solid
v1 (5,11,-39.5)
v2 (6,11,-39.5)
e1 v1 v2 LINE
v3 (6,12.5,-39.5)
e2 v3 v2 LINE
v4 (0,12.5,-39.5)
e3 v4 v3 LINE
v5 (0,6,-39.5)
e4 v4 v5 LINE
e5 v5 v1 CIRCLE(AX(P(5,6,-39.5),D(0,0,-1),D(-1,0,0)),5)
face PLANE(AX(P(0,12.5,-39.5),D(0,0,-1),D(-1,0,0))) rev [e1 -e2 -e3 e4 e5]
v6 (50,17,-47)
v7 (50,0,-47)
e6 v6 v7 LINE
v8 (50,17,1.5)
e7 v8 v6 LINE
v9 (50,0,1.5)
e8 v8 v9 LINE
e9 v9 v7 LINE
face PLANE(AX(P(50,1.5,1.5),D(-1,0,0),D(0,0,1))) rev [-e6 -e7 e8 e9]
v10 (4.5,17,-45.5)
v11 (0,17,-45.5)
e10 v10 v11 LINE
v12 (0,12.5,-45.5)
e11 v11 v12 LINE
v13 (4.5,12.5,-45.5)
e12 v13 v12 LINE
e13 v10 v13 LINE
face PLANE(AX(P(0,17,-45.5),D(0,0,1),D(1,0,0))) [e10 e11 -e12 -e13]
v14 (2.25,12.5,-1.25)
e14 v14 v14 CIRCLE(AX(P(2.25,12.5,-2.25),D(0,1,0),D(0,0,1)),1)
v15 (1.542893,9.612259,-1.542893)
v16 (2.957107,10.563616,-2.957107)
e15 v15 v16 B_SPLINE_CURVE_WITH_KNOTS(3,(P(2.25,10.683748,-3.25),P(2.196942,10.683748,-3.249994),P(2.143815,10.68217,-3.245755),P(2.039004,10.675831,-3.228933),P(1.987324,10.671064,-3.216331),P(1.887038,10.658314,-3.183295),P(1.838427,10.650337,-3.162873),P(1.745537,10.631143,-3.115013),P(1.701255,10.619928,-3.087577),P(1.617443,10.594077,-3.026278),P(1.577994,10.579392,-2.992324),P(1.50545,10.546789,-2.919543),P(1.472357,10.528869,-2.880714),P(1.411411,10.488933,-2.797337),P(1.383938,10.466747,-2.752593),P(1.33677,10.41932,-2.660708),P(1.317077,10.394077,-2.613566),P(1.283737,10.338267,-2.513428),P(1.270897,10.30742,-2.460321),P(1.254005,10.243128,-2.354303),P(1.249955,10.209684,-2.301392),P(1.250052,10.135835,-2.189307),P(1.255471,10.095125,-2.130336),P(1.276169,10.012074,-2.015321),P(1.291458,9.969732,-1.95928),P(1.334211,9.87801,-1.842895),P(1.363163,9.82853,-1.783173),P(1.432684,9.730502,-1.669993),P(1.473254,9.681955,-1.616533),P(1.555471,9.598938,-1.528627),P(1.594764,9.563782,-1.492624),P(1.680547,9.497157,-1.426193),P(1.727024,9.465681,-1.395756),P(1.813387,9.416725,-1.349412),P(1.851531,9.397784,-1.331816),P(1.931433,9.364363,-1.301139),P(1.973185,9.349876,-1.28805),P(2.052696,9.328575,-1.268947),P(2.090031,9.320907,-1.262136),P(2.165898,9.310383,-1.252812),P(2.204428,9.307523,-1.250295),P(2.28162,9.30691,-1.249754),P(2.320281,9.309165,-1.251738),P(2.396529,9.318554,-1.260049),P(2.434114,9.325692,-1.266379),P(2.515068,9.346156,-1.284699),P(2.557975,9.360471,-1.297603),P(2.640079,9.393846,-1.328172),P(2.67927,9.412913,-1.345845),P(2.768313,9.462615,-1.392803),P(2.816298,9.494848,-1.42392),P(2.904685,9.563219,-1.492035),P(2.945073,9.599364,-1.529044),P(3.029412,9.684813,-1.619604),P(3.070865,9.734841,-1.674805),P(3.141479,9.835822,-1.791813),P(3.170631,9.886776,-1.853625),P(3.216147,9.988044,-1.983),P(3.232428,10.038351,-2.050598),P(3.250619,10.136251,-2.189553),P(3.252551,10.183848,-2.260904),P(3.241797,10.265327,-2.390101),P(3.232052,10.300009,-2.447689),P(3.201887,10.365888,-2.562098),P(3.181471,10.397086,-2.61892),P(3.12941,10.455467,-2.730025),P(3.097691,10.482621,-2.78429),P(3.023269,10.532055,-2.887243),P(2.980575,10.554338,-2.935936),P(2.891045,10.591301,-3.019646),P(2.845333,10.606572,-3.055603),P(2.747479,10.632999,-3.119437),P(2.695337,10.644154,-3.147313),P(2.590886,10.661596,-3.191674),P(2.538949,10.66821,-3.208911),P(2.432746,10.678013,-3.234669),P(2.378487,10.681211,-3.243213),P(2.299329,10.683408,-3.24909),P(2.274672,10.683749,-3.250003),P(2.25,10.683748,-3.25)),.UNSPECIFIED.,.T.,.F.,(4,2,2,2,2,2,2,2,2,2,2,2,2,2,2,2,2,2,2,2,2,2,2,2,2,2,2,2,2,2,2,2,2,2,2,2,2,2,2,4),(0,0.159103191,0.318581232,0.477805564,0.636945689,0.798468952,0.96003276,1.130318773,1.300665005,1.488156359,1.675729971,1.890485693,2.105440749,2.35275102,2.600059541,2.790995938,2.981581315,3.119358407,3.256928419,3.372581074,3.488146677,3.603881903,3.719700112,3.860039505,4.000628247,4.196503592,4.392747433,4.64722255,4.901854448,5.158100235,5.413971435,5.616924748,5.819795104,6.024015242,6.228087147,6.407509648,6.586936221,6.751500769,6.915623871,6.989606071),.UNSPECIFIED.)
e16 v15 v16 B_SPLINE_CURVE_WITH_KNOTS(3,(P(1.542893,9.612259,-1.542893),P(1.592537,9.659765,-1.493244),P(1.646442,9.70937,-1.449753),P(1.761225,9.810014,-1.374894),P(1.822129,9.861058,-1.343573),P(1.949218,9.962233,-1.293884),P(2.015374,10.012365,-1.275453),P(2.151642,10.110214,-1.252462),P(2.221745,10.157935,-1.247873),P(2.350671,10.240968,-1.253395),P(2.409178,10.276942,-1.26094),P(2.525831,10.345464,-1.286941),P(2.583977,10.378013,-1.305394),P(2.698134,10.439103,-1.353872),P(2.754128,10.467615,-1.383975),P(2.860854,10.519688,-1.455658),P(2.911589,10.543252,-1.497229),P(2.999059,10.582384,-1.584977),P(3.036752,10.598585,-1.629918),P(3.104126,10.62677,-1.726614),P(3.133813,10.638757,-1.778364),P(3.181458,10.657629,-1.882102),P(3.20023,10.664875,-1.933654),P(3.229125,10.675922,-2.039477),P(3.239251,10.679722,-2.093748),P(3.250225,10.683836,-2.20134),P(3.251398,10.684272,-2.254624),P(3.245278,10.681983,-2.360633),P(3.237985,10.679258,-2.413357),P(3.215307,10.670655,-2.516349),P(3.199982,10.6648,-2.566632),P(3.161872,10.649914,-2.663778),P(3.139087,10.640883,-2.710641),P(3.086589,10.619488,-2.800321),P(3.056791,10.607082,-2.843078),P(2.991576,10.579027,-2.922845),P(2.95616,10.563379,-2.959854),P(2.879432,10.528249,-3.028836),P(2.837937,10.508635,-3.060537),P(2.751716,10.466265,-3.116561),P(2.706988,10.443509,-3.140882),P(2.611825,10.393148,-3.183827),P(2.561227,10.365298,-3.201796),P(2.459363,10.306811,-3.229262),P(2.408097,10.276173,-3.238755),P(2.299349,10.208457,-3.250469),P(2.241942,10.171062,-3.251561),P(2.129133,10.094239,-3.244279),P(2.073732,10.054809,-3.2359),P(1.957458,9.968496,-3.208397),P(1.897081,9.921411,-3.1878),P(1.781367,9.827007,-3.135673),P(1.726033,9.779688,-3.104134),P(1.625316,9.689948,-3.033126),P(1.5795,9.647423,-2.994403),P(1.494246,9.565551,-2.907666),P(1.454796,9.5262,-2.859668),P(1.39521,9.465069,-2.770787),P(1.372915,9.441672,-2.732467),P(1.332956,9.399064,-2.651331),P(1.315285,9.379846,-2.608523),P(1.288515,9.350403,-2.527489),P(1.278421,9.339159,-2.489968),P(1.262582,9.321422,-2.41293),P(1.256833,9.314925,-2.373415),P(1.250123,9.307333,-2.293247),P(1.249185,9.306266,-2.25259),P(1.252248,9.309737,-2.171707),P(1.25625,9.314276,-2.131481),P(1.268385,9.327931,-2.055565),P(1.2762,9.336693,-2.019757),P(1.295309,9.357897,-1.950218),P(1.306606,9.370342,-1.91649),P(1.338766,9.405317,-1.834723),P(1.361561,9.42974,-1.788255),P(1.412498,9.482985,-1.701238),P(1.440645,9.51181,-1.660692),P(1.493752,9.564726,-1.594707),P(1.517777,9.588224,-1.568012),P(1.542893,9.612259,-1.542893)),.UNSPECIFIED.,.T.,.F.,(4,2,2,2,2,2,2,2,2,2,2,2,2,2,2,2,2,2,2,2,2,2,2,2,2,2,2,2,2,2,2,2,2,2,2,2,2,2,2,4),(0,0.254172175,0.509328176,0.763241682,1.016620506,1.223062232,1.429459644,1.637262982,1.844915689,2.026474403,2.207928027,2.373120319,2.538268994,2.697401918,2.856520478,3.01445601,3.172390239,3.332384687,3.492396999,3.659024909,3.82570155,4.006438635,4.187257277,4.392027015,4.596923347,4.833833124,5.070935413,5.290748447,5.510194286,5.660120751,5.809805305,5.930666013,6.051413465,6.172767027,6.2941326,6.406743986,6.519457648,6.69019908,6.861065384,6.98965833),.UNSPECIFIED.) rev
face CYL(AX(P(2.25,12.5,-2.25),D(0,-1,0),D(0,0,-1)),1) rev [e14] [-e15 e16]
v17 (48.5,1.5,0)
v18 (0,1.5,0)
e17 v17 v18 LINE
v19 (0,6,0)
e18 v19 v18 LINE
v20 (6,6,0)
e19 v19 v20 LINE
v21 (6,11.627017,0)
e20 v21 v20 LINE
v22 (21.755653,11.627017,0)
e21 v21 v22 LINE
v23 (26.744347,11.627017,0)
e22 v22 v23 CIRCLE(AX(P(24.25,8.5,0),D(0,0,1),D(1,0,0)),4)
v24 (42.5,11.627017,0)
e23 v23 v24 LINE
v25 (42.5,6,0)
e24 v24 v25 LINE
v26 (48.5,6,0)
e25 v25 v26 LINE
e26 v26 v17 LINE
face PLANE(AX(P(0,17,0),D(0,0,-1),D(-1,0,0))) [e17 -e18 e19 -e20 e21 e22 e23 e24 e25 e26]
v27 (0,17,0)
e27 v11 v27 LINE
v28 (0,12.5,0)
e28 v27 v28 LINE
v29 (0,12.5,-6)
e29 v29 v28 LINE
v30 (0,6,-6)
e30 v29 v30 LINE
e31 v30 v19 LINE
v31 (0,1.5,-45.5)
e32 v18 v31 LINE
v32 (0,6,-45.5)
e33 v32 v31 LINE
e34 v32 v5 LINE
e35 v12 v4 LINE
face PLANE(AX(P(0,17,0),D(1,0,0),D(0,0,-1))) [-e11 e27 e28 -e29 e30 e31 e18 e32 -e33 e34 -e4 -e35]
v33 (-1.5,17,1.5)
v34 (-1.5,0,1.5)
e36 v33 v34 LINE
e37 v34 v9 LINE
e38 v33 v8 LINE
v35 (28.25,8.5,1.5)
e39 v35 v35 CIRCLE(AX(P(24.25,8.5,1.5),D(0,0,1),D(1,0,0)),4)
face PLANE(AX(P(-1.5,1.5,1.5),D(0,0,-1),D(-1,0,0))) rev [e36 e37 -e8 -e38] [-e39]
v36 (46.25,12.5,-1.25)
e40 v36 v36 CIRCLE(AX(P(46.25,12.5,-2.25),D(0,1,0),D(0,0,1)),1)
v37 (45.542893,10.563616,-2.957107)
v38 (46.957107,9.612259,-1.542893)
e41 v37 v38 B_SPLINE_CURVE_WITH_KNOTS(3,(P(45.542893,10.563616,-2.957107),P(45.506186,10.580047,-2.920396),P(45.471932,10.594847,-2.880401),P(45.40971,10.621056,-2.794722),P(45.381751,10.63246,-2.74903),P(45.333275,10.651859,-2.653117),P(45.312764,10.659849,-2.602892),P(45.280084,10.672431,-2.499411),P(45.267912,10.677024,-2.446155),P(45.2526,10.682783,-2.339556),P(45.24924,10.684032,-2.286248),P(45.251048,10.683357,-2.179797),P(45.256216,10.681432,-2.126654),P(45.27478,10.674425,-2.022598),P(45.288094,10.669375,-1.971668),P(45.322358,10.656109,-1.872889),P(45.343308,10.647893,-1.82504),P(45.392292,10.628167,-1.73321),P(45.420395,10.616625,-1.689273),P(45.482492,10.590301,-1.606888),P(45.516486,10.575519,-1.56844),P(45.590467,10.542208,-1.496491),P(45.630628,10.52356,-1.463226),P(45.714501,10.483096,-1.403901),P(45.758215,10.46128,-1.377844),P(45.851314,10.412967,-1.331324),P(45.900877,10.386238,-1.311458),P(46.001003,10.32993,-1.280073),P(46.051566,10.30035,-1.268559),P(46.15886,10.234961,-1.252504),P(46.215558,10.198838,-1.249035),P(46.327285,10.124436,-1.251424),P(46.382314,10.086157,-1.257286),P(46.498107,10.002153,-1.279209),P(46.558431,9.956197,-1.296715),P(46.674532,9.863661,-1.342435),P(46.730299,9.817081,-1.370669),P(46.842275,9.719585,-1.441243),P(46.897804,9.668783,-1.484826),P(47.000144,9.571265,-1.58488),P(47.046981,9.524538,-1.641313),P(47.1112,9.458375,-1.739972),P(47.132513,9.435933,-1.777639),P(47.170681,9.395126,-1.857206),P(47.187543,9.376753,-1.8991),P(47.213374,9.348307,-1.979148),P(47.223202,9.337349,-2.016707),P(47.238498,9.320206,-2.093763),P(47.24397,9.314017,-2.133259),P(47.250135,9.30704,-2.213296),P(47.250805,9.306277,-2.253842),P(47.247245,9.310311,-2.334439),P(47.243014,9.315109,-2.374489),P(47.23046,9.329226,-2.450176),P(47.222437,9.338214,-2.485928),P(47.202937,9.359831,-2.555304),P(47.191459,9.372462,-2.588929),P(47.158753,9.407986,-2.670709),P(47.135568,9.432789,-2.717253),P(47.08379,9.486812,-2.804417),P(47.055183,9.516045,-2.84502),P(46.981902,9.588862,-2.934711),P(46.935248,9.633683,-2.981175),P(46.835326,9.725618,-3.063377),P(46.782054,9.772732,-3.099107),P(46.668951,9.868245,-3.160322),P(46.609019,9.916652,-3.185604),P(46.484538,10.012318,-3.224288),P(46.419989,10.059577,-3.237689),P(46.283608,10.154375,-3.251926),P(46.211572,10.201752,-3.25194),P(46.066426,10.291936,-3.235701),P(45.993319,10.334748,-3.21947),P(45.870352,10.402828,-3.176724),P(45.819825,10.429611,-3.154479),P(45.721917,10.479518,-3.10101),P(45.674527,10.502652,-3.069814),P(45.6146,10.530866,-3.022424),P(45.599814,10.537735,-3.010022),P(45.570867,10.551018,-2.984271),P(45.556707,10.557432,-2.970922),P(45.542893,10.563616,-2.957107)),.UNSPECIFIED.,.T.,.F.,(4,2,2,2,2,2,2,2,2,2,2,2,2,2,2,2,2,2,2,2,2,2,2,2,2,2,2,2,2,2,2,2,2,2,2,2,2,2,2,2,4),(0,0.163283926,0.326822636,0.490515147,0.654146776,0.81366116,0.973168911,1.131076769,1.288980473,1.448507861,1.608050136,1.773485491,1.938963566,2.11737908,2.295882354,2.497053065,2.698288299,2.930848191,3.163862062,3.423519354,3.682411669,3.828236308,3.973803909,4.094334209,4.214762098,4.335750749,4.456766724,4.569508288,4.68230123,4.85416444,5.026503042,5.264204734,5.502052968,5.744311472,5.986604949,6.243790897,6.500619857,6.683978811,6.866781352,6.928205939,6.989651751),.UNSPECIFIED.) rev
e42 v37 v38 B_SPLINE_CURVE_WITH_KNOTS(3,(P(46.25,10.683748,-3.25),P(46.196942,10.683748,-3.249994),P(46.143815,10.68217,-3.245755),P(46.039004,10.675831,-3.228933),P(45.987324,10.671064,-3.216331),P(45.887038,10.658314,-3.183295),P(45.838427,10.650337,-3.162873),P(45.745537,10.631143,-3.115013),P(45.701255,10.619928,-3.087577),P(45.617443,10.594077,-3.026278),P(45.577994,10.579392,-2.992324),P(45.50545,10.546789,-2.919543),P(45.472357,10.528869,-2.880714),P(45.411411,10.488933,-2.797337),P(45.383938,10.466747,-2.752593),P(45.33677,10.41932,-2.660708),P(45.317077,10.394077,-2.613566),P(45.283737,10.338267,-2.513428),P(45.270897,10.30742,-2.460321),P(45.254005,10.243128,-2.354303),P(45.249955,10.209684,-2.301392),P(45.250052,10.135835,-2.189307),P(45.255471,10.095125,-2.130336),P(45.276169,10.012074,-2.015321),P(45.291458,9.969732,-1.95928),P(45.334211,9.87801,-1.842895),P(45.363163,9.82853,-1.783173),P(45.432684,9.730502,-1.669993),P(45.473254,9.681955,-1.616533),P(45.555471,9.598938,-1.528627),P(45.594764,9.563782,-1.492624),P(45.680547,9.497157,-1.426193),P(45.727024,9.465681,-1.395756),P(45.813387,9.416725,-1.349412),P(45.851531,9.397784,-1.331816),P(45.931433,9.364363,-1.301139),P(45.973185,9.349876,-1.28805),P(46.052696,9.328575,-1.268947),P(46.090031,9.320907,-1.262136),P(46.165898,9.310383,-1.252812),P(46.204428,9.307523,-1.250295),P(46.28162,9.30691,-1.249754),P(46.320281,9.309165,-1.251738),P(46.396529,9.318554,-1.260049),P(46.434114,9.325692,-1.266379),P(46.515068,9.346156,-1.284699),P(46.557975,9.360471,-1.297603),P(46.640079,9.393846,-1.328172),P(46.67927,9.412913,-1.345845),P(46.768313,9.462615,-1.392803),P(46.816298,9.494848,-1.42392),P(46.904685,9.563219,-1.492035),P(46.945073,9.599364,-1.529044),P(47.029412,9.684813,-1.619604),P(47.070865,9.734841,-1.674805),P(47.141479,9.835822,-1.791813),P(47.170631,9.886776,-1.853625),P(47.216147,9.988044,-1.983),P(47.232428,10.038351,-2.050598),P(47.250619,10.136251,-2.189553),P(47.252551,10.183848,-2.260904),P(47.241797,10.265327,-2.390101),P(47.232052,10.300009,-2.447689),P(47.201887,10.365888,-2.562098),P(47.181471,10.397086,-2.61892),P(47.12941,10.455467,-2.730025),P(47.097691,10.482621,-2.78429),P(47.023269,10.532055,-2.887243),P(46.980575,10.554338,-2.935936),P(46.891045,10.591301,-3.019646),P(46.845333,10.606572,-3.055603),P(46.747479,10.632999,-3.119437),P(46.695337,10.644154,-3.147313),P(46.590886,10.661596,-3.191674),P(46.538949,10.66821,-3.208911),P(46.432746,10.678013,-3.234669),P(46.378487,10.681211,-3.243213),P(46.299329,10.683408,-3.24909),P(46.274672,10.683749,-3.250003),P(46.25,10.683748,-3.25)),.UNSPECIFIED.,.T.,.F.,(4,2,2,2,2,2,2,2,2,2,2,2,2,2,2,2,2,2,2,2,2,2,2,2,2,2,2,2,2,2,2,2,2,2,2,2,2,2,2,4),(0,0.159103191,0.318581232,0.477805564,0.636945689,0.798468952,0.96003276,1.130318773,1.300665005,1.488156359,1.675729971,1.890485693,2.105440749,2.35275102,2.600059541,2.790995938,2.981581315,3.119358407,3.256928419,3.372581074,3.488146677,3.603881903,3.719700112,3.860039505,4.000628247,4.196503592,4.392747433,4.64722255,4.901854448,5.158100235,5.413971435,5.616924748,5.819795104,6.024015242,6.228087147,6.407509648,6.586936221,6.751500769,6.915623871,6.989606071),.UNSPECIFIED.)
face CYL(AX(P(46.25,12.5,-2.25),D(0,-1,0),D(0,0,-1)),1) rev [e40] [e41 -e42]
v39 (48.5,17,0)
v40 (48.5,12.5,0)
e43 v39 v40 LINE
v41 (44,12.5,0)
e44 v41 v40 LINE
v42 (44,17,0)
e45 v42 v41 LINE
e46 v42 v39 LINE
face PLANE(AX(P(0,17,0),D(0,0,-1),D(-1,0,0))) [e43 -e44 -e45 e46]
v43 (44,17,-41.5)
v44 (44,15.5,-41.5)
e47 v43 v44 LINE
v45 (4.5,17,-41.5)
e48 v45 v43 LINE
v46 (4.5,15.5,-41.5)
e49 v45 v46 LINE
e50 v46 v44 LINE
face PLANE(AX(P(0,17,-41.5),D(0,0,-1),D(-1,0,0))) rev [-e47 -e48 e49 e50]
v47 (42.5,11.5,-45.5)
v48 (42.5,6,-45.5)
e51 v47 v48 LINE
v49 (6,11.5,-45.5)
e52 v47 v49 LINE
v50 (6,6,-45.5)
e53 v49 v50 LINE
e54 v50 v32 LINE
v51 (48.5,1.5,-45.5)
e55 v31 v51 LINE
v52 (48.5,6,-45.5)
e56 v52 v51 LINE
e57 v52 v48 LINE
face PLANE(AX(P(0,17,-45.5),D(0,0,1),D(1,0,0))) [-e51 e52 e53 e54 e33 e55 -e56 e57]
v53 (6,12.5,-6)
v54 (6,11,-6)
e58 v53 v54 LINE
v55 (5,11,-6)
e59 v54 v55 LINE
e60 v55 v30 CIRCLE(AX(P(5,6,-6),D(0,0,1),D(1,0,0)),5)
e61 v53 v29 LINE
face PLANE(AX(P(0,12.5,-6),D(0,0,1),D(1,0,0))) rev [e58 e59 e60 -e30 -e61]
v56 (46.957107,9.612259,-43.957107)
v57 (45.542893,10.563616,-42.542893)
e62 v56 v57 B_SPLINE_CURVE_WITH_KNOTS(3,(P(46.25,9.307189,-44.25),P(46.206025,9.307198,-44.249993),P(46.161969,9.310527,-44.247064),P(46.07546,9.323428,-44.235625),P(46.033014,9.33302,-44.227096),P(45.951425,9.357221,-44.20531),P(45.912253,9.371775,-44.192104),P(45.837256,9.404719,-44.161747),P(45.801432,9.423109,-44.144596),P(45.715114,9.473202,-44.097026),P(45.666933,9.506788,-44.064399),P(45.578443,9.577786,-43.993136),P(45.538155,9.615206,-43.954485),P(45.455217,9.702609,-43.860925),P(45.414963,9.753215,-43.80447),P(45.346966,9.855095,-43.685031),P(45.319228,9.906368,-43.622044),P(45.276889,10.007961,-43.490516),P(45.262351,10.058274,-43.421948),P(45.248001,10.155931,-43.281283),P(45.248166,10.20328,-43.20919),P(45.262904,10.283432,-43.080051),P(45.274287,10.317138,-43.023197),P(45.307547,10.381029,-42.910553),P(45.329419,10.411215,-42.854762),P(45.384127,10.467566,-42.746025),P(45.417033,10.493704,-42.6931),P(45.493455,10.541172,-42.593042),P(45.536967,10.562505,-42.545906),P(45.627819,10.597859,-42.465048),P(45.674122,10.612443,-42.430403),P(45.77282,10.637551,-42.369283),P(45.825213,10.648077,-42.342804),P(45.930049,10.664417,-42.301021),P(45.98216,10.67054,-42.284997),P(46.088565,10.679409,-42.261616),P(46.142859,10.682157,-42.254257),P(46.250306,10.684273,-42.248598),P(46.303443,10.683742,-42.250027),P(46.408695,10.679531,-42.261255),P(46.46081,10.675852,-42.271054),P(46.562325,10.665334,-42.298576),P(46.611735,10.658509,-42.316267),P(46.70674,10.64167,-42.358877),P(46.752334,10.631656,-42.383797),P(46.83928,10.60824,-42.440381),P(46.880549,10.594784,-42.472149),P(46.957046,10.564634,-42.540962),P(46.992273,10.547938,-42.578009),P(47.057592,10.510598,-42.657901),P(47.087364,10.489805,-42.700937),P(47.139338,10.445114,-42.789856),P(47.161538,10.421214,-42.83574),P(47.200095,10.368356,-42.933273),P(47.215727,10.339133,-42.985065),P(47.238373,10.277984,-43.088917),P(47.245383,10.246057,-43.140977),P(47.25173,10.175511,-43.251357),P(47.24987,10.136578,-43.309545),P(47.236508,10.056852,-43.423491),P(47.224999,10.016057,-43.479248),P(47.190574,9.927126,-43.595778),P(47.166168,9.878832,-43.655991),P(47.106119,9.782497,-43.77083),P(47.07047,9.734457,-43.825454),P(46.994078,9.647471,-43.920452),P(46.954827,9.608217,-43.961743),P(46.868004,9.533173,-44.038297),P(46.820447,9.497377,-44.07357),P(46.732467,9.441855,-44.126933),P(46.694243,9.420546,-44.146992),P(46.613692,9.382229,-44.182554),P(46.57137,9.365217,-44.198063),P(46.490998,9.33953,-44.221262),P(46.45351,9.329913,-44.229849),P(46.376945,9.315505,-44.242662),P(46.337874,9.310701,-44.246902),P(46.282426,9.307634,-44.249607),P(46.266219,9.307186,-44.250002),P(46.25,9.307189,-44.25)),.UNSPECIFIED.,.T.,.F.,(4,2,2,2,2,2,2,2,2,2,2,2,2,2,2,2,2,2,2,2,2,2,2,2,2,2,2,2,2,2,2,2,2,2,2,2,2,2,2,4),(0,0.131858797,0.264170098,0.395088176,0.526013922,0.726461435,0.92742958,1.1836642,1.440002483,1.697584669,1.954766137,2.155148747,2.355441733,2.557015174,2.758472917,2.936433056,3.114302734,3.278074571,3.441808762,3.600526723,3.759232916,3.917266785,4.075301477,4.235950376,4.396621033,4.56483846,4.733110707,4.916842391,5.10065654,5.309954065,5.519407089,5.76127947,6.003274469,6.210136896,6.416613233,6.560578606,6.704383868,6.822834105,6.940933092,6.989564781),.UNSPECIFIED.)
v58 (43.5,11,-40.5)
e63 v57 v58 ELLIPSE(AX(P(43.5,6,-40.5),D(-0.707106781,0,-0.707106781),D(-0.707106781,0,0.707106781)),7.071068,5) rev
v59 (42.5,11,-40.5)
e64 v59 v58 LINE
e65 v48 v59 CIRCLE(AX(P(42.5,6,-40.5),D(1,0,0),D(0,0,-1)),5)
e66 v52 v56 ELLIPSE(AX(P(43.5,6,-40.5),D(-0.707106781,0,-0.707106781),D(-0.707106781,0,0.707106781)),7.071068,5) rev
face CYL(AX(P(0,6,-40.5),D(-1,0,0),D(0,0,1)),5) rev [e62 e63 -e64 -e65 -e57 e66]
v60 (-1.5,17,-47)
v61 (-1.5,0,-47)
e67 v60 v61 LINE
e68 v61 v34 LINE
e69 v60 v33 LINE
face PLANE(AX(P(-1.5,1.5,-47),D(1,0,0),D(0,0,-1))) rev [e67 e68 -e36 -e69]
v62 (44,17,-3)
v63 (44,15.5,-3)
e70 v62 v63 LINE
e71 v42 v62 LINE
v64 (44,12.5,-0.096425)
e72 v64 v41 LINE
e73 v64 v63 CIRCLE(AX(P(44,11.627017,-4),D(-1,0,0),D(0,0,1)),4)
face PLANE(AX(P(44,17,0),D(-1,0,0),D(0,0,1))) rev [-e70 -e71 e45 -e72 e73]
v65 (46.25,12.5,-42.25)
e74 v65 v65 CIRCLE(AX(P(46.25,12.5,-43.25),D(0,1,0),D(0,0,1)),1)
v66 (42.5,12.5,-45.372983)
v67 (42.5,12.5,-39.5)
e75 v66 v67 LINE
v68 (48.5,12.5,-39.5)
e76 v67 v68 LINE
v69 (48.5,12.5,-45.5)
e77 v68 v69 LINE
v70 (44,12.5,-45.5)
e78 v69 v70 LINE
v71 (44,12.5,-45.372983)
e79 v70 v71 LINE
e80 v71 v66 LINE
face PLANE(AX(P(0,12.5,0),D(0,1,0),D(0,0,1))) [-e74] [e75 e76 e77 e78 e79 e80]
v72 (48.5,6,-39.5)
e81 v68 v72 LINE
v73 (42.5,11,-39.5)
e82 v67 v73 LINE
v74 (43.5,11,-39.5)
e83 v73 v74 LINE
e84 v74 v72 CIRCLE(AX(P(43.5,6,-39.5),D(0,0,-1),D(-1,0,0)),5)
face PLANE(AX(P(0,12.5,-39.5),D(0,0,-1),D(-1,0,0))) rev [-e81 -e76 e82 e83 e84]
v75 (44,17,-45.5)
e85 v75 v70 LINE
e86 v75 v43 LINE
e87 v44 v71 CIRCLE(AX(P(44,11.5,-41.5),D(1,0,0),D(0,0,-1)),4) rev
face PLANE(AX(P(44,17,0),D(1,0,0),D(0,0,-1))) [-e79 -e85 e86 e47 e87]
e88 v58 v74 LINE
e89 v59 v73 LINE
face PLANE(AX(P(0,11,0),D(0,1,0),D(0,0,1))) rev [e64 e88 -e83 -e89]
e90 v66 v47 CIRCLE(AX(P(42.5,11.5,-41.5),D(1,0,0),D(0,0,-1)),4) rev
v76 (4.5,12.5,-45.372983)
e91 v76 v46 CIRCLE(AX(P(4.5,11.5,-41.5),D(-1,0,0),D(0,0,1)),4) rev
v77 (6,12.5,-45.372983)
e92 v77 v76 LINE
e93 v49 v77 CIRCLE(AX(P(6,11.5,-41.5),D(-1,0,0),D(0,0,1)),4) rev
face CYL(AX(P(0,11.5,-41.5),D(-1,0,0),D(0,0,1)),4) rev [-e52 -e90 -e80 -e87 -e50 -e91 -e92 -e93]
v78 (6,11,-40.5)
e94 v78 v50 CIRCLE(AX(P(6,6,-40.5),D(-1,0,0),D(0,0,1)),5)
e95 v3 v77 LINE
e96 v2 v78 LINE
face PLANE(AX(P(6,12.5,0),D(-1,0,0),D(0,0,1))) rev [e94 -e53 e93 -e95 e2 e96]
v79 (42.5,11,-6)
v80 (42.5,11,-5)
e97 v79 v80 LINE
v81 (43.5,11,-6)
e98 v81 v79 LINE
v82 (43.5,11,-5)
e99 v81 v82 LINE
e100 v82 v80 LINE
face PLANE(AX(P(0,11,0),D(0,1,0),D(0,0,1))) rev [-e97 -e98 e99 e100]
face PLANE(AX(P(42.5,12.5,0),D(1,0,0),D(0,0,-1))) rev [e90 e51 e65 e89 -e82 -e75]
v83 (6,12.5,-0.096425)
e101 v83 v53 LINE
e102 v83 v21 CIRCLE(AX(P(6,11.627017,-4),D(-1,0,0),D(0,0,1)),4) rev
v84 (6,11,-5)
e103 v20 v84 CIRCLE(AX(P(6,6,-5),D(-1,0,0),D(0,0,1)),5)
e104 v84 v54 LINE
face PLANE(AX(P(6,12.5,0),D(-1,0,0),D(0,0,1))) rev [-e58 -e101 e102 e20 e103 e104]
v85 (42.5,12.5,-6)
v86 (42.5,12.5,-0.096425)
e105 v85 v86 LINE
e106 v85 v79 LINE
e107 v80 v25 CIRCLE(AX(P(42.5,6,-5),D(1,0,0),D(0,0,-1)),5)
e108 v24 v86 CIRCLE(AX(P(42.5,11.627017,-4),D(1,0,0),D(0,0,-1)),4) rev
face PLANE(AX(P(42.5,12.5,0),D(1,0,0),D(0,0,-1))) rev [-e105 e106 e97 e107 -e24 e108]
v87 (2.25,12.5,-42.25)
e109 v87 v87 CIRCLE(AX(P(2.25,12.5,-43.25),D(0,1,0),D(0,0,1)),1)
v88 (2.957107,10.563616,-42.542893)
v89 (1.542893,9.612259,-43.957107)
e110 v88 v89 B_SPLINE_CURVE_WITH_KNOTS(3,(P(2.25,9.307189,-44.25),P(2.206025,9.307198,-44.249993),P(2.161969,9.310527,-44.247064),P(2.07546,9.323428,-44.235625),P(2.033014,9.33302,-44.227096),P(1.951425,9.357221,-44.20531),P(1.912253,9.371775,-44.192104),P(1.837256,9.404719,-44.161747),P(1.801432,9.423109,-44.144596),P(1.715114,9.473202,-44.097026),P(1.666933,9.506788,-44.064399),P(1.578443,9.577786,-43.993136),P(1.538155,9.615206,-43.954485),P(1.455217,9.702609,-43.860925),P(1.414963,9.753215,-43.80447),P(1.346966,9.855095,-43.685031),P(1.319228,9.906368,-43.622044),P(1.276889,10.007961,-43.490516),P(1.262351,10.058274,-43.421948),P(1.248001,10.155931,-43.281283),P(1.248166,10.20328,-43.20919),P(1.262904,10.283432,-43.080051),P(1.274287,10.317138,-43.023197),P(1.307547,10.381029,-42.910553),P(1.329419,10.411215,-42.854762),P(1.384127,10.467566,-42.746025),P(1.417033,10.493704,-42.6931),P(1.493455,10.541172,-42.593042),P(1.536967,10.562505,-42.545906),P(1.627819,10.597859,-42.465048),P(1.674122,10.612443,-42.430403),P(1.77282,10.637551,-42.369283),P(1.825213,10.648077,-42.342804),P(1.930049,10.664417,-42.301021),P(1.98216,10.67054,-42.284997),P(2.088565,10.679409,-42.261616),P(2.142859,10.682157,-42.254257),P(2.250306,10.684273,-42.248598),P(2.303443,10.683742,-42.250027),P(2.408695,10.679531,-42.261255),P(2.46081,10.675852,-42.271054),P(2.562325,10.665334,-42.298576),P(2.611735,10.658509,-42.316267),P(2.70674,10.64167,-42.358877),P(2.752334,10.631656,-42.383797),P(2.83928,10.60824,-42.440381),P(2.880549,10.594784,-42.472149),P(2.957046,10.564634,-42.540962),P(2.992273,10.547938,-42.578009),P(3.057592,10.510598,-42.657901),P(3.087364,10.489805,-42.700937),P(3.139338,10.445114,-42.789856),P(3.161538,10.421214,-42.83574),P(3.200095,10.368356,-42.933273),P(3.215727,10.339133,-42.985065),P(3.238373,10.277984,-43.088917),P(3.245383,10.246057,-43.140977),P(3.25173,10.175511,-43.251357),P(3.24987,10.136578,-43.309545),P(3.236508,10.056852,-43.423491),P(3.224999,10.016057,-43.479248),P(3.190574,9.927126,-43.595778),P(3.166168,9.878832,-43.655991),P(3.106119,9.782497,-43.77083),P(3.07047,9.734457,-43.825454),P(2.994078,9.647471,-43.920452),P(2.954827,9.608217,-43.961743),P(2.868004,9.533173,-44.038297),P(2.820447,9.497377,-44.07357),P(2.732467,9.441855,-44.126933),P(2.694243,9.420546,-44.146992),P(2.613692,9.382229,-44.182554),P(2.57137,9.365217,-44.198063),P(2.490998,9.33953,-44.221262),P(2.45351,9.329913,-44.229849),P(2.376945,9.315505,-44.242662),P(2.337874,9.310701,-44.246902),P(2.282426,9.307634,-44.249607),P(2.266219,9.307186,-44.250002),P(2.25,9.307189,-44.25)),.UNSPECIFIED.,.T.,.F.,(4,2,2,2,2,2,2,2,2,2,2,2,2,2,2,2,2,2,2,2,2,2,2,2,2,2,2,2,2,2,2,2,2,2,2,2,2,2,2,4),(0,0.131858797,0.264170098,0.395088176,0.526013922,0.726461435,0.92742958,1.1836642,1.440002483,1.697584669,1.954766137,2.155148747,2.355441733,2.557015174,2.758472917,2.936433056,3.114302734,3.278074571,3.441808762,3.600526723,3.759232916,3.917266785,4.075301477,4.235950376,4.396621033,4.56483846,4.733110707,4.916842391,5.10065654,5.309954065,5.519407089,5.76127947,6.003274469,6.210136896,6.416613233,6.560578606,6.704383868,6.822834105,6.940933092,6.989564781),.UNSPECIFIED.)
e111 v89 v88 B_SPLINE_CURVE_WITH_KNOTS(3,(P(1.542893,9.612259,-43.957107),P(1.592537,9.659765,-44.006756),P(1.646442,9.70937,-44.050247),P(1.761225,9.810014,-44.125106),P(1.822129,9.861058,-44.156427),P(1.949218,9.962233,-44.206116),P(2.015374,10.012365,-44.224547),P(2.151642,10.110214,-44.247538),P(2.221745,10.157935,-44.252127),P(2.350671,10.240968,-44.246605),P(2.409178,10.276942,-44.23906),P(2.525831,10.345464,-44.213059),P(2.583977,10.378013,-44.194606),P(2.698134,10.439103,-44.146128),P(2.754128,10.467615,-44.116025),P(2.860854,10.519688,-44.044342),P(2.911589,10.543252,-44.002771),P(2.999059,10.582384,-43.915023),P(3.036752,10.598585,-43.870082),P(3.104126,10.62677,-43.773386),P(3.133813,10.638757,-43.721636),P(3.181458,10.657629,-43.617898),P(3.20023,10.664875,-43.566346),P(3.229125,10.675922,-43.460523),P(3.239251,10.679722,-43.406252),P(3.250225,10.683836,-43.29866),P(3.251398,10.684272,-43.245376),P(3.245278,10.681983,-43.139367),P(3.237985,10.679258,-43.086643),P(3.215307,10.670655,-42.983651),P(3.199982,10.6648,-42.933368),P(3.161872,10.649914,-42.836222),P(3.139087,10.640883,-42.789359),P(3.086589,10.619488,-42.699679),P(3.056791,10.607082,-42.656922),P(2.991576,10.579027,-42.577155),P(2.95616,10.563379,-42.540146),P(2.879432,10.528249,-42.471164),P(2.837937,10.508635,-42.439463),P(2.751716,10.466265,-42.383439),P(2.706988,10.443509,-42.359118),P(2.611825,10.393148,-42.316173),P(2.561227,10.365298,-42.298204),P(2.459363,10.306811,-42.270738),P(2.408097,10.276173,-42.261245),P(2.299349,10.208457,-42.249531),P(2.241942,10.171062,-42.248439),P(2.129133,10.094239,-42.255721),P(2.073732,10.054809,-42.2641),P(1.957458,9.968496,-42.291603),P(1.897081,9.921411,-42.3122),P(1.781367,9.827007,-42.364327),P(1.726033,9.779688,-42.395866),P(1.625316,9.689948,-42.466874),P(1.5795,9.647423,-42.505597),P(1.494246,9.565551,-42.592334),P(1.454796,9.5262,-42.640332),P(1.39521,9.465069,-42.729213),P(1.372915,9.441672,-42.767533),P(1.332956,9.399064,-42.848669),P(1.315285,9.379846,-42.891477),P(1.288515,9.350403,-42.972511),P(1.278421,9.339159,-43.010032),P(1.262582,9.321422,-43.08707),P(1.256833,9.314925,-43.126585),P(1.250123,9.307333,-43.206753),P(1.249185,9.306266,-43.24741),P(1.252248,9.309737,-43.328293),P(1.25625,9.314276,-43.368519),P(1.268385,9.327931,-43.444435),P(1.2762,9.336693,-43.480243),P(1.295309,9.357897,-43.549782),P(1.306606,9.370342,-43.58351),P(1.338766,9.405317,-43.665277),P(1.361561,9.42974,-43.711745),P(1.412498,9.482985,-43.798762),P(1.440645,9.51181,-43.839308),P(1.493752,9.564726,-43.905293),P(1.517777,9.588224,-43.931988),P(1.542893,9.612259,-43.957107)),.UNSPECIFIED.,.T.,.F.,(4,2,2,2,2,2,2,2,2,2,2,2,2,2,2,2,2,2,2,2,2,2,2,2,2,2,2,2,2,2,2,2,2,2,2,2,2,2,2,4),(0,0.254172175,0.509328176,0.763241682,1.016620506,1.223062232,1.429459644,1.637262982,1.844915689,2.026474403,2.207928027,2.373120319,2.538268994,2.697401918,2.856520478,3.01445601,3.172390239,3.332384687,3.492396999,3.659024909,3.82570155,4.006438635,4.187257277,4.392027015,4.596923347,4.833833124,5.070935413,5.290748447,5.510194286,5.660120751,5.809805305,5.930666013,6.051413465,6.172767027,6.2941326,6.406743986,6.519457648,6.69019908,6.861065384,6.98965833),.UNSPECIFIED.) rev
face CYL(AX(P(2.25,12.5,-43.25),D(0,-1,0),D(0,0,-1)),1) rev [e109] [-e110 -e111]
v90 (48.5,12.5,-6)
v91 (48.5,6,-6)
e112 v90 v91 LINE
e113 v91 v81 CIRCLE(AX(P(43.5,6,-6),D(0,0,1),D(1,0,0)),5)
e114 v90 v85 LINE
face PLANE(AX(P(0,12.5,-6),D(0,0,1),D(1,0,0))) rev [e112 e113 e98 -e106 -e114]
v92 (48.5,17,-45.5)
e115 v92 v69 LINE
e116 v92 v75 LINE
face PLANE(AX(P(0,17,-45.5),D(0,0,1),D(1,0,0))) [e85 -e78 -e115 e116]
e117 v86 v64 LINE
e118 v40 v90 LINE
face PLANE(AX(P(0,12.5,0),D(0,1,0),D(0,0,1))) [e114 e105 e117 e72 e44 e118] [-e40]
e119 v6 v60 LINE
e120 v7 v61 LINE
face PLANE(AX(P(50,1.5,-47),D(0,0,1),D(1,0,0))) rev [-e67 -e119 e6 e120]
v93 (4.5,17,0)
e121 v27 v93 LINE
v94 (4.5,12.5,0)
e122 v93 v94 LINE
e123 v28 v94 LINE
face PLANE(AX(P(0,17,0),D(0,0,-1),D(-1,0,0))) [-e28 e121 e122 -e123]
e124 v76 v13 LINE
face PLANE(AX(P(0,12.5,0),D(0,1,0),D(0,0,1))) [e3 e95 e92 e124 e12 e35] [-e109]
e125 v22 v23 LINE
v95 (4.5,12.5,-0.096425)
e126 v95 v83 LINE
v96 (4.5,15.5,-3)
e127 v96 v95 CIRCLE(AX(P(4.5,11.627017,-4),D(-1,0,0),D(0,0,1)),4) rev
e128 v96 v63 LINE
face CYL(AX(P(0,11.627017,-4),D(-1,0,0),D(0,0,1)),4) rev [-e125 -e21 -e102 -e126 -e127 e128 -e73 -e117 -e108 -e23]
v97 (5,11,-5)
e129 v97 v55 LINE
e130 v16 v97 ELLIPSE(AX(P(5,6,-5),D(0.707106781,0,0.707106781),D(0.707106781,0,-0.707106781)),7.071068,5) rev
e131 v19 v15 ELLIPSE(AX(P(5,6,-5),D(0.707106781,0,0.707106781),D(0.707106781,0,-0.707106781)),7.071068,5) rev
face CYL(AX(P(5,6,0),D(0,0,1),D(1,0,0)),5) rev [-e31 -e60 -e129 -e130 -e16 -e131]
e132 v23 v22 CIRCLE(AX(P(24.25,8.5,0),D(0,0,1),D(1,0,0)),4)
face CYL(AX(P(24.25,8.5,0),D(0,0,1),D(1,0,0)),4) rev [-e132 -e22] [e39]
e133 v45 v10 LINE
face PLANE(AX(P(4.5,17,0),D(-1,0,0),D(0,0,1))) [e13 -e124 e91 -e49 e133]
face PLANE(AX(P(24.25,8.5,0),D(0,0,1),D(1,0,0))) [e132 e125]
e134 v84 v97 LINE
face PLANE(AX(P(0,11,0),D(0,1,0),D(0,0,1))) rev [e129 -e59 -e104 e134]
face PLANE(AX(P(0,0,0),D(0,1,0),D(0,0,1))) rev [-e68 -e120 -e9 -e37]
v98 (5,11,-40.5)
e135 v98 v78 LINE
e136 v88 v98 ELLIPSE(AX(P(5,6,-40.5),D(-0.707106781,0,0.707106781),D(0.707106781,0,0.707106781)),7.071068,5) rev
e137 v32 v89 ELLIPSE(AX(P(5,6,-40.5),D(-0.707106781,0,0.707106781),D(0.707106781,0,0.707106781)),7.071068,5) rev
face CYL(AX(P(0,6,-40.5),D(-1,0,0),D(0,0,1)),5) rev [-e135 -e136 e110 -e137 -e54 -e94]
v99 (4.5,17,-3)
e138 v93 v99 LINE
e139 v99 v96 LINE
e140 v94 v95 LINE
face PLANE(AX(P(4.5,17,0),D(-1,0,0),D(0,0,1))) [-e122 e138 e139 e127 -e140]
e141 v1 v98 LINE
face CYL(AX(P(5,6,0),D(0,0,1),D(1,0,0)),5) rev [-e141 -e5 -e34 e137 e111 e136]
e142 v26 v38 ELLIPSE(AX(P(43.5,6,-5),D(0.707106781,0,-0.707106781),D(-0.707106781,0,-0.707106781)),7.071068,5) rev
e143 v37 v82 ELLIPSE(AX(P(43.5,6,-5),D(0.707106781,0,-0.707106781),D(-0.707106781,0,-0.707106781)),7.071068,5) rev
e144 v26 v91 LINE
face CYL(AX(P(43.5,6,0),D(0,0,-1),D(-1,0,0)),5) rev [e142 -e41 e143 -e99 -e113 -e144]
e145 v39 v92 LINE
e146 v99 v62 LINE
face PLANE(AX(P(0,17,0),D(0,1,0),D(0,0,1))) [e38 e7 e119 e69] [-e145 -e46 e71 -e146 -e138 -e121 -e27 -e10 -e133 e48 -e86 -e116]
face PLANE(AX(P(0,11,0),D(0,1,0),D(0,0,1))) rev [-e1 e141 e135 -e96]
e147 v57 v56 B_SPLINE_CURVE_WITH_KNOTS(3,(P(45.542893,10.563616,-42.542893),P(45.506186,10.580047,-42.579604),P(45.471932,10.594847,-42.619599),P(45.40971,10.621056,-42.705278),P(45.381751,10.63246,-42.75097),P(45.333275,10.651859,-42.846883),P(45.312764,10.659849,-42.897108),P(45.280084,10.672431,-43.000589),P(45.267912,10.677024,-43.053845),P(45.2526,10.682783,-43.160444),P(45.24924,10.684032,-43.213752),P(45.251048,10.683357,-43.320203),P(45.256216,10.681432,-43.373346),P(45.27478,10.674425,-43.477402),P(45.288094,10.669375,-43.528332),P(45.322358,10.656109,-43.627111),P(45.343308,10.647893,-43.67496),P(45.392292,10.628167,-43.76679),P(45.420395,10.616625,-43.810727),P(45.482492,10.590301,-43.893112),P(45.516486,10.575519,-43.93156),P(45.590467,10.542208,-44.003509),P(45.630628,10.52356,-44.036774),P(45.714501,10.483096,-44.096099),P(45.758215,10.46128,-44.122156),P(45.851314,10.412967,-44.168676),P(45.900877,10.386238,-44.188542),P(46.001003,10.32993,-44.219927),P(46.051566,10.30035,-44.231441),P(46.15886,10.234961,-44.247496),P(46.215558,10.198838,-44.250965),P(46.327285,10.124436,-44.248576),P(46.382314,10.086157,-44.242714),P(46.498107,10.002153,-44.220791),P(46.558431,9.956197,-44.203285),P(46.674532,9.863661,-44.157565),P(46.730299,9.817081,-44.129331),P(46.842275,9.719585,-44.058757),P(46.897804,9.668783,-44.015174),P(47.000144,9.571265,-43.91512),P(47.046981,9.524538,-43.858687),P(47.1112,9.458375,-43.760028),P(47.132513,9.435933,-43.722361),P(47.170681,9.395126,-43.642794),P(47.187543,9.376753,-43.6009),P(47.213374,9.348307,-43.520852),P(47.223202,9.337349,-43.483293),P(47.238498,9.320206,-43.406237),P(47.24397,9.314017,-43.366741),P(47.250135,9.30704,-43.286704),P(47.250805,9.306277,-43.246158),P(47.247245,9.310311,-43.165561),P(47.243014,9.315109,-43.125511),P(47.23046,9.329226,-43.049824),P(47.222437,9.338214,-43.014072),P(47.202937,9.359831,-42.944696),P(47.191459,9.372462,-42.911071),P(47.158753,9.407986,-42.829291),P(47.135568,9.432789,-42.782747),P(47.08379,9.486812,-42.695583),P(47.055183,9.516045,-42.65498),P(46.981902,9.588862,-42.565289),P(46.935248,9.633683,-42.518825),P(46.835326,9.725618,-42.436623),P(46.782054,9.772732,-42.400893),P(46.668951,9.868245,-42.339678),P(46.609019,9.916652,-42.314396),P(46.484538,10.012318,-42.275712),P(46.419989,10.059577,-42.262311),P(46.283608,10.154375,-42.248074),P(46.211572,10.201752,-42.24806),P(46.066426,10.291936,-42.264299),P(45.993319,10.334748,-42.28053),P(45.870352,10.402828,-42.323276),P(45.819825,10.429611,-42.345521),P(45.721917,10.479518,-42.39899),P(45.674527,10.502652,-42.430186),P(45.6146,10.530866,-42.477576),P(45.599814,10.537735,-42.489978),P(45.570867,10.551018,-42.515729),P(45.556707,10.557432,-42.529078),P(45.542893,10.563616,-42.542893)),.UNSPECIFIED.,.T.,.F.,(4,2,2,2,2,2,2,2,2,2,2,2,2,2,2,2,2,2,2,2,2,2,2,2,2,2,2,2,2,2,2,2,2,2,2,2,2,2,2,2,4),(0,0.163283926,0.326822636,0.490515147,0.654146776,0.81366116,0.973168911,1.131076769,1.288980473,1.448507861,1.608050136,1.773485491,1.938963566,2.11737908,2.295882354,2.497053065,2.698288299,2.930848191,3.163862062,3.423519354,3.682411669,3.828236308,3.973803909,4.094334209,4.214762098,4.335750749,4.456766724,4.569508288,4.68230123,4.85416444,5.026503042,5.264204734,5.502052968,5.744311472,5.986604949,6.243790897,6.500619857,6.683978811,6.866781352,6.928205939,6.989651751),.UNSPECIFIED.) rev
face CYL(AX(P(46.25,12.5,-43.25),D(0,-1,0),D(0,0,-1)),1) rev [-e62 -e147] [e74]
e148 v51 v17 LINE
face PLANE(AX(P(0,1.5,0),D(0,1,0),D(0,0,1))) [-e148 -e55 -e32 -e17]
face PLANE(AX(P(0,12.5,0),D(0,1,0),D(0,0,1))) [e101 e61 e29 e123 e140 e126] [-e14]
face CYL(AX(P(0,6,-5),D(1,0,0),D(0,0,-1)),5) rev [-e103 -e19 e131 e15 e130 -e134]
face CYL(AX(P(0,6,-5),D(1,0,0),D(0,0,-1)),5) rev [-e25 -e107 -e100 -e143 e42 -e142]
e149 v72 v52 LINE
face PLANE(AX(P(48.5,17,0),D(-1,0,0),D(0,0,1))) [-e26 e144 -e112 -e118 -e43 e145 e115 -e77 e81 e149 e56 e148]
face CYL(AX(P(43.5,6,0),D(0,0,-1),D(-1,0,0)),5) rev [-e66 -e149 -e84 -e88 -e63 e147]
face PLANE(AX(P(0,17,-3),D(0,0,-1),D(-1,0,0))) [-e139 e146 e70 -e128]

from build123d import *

# Parameters (mm, degrees)
SKETCH1_W          = 51.5
SKETCH1_H          = 48.5
BASE_DEPTH         = 1.5
SKETCH1_6_W        = 51.5
SKETCH1_6_H        = 48.5
WALLS_DEPTH        = 17
SCREWS_START       = 11
SKETCH1_7_R        = 1
SKETCH1_7_W        = 1.5
SKETCH1_7_H        = 3
SKETCH1_7_H_2      = 4
SCREWS_DEPTH       = 1.5
TOP_START          = 15.5
SKETCH1_8_W        = 39.5
SKETCH1_8_H        = 3
SKETCH1_8_H_2      = 4
TOP_DEPTH          = 1.5
FILLET1_R          = 5
FILLET3_R          = 4
SKETCH2_R          = 4
CUT_EXTRUDE1_DEPTH = 1.5


with BuildPart() as part:
    # Sketch1 → base (new body)
    with BuildSketch(Plane(origin=(0, 0, 0), x_dir=(1, 0, 0), z_dir=(0, 1, 0))):
        with Locations((24.25, 22.75)):
            Rectangle(SKETCH1_W, SKETCH1_H)
    extrude(amount=BASE_DEPTH)

    # Sketch1<6> → walls (add)
    with BuildSketch(Plane(origin=(0, 0, 0), x_dir=(1, 0, 0), z_dir=(0, 1, 0))):
        with Locations((24.25, 22.75)):
            Rectangle(SKETCH1_6_W, SKETCH1_6_H)
        Polygon((4.5, 0), (0, 0), (0, 4.5), (0, 6), (0, 39.5), (0, 41), (0, 45.5), (4.5, 45.5), (6, 45.5), (42.5, 45.5), (44, 45.5), (48.5, 45.5), (48.5, 41), (48.5, 39.5), (48.5, 6), (48.5, 4.5), (48.5, 0), (44, 0), (42.5, 0), (6, 0), align=None, mode=Mode.SUBTRACT)
    extrude(amount=WALLS_DEPTH)

    # Sketch1<7> → screws (add)
    # profile 1 of 12: a face of its own
    with BuildSketch(Plane(origin=(0, 0, 0), x_dir=(1, 0, 0), z_dir=(0, 1, 0)).offset(SCREWS_START)):
        Polygon((44, 3), (44, 0), (48.5, 0), (48.5, 4.5), (44, 4.5), align=None)
        with Locations(Location((46.25, 2.25, 0), (0, 0, 270))):
            Circle(SKETCH1_7_R, mode=Mode.SUBTRACT)
    # profile 2 of 12: a face of its own
    with BuildSketch(Plane(origin=(0, 0, 0), x_dir=(1, 0, 0), z_dir=(0, 1, 0)).offset(SCREWS_START)):
        Polygon((42.5, 6), (42.5, 3), (44, 3), (44, 4.5), (48.5, 4.5), (48.5, 6), align=None)
    # profile 3 of 12: a face of its own
    with BuildSketch(Plane(origin=(0, 0, 0), x_dir=(1, 0, 0), z_dir=(0, 1, 0)).offset(SCREWS_START)):
        with Locations((43.25, 1.5)):
            Rectangle(SKETCH1_7_W, SKETCH1_7_H)
    # profile 4 of 12: a face of its own
    with BuildSketch(Plane(origin=(0, 0, 0), x_dir=(1, 0, 0), z_dir=(0, 1, 0)).offset(SCREWS_START)):
        Polygon((44, 41.5), (42.5, 41.5), (42.5, 39.5), (48.5, 39.5), (48.5, 41), (44, 41), align=None)
    # profile 5 of 12: a face of its own
    with BuildSketch(Plane(origin=(0, 0, 0), x_dir=(1, 0, 0), z_dir=(0, 1, 0)).offset(SCREWS_START)):
        Polygon((44, 45.5), (44, 41.5), (44, 41), (48.5, 41), (48.5, 45.5), align=None)
        with Locations(Location((46.25, 43.25, 0), (0, 0, 270))):
            Circle(SKETCH1_7_R, mode=Mode.SUBTRACT)
    # profile 6 of 12: a face of its own
    with BuildSketch(Plane(origin=(0, 0, 0), x_dir=(1, 0, 0), z_dir=(0, 1, 0)).offset(SCREWS_START)):
        with Locations((43.25, 43.5)):
            Rectangle(SKETCH1_7_W, SKETCH1_7_H_2)
    # profile 7 of 12: a face of its own
    with BuildSketch(Plane(origin=(0, 0, 0), x_dir=(1, 0, 0), z_dir=(0, 1, 0)).offset(SCREWS_START)):
        Polygon((0, 41), (0, 39.5), (6, 39.5), (6, 41.5), (4.5, 41.5), (4.5, 41), align=None)
    # profile 8 of 12: a face of its own
    with BuildSketch(Plane(origin=(0, 0, 0), x_dir=(1, 0, 0), z_dir=(0, 1, 0)).offset(SCREWS_START)):
        Polygon((0, 45.5), (0, 41), (4.5, 41), (4.5, 41.5), (4.5, 45.5), align=None)
        with Locations(Location((2.25, 43.25, 0), (0, 0, 270))):
            Circle(SKETCH1_7_R, mode=Mode.SUBTRACT)
    # profile 9 of 12: a face of its own
    with BuildSketch(Plane(origin=(0, 0, 0), x_dir=(1, 0, 0), z_dir=(0, 1, 0)).offset(SCREWS_START)):
        with Locations((5.25, 43.5)):
            Rectangle(SKETCH1_7_W, SKETCH1_7_H_2)
    # profile 10 of 12: a face of its own
    with BuildSketch(Plane(origin=(0, 0, 0), x_dir=(1, 0, 0), z_dir=(0, 1, 0)).offset(SCREWS_START)):
        Polygon((0, 4.5), (0, 0), (4.5, 0), (4.5, 3), (4.5, 4.5), align=None)
        with Locations(Location((2.25, 2.25, 0), (0, 0, 270))):
            Circle(SKETCH1_7_R, mode=Mode.SUBTRACT)
    # profile 11 of 12: a face of its own
    with BuildSketch(Plane(origin=(0, 0, 0), x_dir=(1, 0, 0), z_dir=(0, 1, 0)).offset(SCREWS_START)):
        Polygon((0, 6), (0, 4.5), (4.5, 4.5), (4.5, 3), (6, 3), (6, 6), align=None)
    # profile 12 of 12: a face of its own
    with BuildSketch(Plane(origin=(0, 0, 0), x_dir=(1, 0, 0), z_dir=(0, 1, 0)).offset(SCREWS_START)):
        with Locations((5.25, 1.5)):
            Rectangle(SKETCH1_7_W, SKETCH1_7_H)
    extrude(amount=SCREWS_DEPTH)

    # Sketch1<8> → top (add)
    with BuildSketch(Plane(origin=(0, 0, 0), x_dir=(1, 0, 0), z_dir=(0, 1, 0)).offset(TOP_START)):
        with Locations((24.25, 1.5)):
            Rectangle(SKETCH1_8_W, SKETCH1_8_H)
        with Locations((24.25, 43.5)):
            Rectangle(SKETCH1_8_W, SKETCH1_8_H_2)
    extrude(amount=TOP_DEPTH)

    # Fillet1
    # the kernel refuses this fillet: 5 mm, written as the material it adds along each edge
    with BuildSketch(Plane(origin=(0, 11, 0), x_dir=(0, -1, 0), z_dir=(1, 0, 0))) as fillet1_piece_1_section:
        with BuildLine():
            CenterArc((FILLET1_R, FILLET1_R), FILLET1_R, 180, 90)
            Line((0, FILLET1_R), (0, 0))
            Line((0, 0), (FILLET1_R, 0))
        make_face()
    fillet1_piece_1 = extrude(amount=6, mode=Mode.PRIVATE)
    fillet1_piece_1 = fillet1_piece_1 - Plane(origin=(2.25, 9.80856061, -2.25), x_dir=(0, 0, 1), z_dir=(0, -1, 0)) * Cylinder(1, 33, mode=Mode.PRIVATE)
    add(fillet1_piece_1)
    with BuildSketch(Plane(origin=(0, 11, -6), x_dir=(0, -1, 0), z_dir=(0, 0, 1))) as fillet1_piece_2_section:
        with BuildLine():
            CenterArc((FILLET1_R, FILLET1_R), FILLET1_R, 180, 90)
            Line((0, FILLET1_R), (0, 0))
            Line((0, 0), (FILLET1_R, 0))
        make_face()
    fillet1_piece_2 = extrude(amount=6, mode=Mode.PRIVATE)
    fillet1_piece_2 = fillet1_piece_2 - Plane(origin=(2.25, 9.808553236, -2.25), x_dir=(0, 0, 1), z_dir=(0, -1, 0)) * Cylinder(1, 32, mode=Mode.PRIVATE)
    add(fillet1_piece_2)
    with BuildSketch(Plane(origin=(0, 11, -45.5), x_dir=(0, -1, 0), z_dir=(0, 0, 1))) as fillet1_piece_3_section:
        with BuildLine():
            CenterArc((FILLET1_R, FILLET1_R), FILLET1_R, 180, 90)
            Line((0, FILLET1_R), (0, 0))
            Line((0, 0), (FILLET1_R, 0))
        make_face()
    fillet1_piece_3 = extrude(amount=6, mode=Mode.PRIVATE)
    fillet1_piece_3 = fillet1_piece_3 - Plane(origin=(2.25, 9.808553112, -43.25), x_dir=(0, 0, 1), z_dir=(0, -1, 0)) * Cylinder(1, 32, mode=Mode.PRIVATE)
    add(fillet1_piece_3)
    with BuildSketch(Plane(origin=(0, 11, -45.5), x_dir=(0, -1, 0), z_dir=(1, 0, 0))) as fillet1_piece_4_section:
        with BuildLine():
            CenterArc((FILLET1_R, -FILLET1_R), FILLET1_R, 90, 90)
            Line((0, -FILLET1_R), (0, 0))
            Line((0, 0), (FILLET1_R, 0))
        make_face()
    fillet1_piece_4 = extrude(amount=6, mode=Mode.PRIVATE)
    fillet1_piece_4 = fillet1_piece_4 - Plane(origin=(2.25, 9.808558943, -43.25), x_dir=(0, 0, 1), z_dir=(0, -1, 0)) * Cylinder(1, 33, mode=Mode.PRIVATE)
    add(fillet1_piece_4)
    with BuildSketch(Plane(origin=(48.5, 11, -45.5), x_dir=(0, -1, 0), z_dir=(-1, 0, 0))) as fillet1_piece_5_section:
        with BuildLine():
            CenterArc((FILLET1_R, FILLET1_R), FILLET1_R, 180, 90)
            Line((0, FILLET1_R), (0, 0))
            Line((0, 0), (FILLET1_R, 0))
        make_face()
    fillet1_piece_5 = extrude(amount=6, mode=Mode.PRIVATE)
    fillet1_piece_5 = fillet1_piece_5 - Plane(origin=(46.25, 9.808558971, -43.25), x_dir=(0, 0, 1), z_dir=(0, -1, 0)) * Cylinder(1, 33, mode=Mode.PRIVATE)
    add(fillet1_piece_5)
    with BuildSketch(Plane(origin=(48.5, 11, -45.5), x_dir=(0, -1, 0), z_dir=(0, 0, 1))) as fillet1_piece_6_section:
        with BuildLine():
            CenterArc((FILLET1_R, -FILLET1_R), FILLET1_R, 90, 90)
            Line((0, -FILLET1_R), (0, 0))
            Line((0, 0), (FILLET1_R, 0))
        make_face()
    fillet1_piece_6 = extrude(amount=6, mode=Mode.PRIVATE)
    fillet1_piece_6 = fillet1_piece_6 - Plane(origin=(46.25, 9.808552814, -43.25), x_dir=(0, 0, 1), z_dir=(0, -1, 0)) * Cylinder(1, 33, mode=Mode.PRIVATE)
    add(fillet1_piece_6)
    with BuildSketch(Plane(origin=(48.5, 11, -6), x_dir=(0, -1, 0), z_dir=(0, 0, 1))) as fillet1_piece_7_section:
        with BuildLine():
            CenterArc((FILLET1_R, -FILLET1_R), FILLET1_R, 90, 90)
            Line((0, -FILLET1_R), (0, 0))
            Line((0, 0), (FILLET1_R, 0))
        make_face()
    fillet1_piece_7 = extrude(amount=6, mode=Mode.PRIVATE)
    fillet1_piece_7 = fillet1_piece_7 - Plane(origin=(46.25, 9.808552873, -2.25), x_dir=(0, 0, 1), z_dir=(0, -1, 0)) * Cylinder(1, 33, mode=Mode.PRIVATE)
    add(fillet1_piece_7)
    with BuildSketch(Plane(origin=(48.5, 11, 0), x_dir=(0, -1, 0), z_dir=(-1, 0, 0))) as fillet1_piece_8_section:
        with BuildLine():
            CenterArc((FILLET1_R, -FILLET1_R), FILLET1_R, 90, 90)
            Line((0, -FILLET1_R), (0, 0))
            Line((0, 0), (FILLET1_R, 0))
        make_face()
    fillet1_piece_8 = extrude(amount=6, mode=Mode.PRIVATE)
    fillet1_piece_8 = fillet1_piece_8 - Plane(origin=(46.25, 9.808560411, -2.25), x_dir=(0, 0, 1), z_dir=(0, -1, 0)) * Cylinder(1, 32, mode=Mode.PRIVATE)
    add(fillet1_piece_8)

    # Fillet3
    # the kernel refuses this fillet: 4 mm, written as the material it adds along each edge
    with BuildSketch(Plane(origin=(4.5, 15.5, 0), x_dir=(0, -1, 0), z_dir=(1, 0, 0))) as fillet3_piece_1:
        with BuildLine():
            CenterArc((3.872983346, 4), FILLET3_R, 194.477512186, 75.522487814)
            Line((0, 3), (0, 0))
            Line((0, 0), (3.872983346, 0))
        make_face()
    extrude(amount=39.5)
    with BuildSketch(Plane(origin=(44, 15.5, -45.5), x_dir=(0, -1, 0), z_dir=(-1, 0, 0))) as fillet3_piece_2:
        with BuildLine():
            CenterArc((FILLET3_R, FILLET3_R), FILLET3_R, 180, 90)
            Line((0, FILLET3_R), (0, 0))
            Line((0, 0), (FILLET3_R, 0))
        make_face()
    extrude(amount=39.5)

    # Sketch2 → Cut-Extrude1 (cut)
    with BuildSketch(Plane.XY.offset(1.5)):
        with Locations((24.25, 8.5)):
            Circle(SKETCH2_R)
    extrude(amount=-CUT_EXTRUDE1_DEPTH, mode=Mode.SUBTRACT)


solid = part.part
